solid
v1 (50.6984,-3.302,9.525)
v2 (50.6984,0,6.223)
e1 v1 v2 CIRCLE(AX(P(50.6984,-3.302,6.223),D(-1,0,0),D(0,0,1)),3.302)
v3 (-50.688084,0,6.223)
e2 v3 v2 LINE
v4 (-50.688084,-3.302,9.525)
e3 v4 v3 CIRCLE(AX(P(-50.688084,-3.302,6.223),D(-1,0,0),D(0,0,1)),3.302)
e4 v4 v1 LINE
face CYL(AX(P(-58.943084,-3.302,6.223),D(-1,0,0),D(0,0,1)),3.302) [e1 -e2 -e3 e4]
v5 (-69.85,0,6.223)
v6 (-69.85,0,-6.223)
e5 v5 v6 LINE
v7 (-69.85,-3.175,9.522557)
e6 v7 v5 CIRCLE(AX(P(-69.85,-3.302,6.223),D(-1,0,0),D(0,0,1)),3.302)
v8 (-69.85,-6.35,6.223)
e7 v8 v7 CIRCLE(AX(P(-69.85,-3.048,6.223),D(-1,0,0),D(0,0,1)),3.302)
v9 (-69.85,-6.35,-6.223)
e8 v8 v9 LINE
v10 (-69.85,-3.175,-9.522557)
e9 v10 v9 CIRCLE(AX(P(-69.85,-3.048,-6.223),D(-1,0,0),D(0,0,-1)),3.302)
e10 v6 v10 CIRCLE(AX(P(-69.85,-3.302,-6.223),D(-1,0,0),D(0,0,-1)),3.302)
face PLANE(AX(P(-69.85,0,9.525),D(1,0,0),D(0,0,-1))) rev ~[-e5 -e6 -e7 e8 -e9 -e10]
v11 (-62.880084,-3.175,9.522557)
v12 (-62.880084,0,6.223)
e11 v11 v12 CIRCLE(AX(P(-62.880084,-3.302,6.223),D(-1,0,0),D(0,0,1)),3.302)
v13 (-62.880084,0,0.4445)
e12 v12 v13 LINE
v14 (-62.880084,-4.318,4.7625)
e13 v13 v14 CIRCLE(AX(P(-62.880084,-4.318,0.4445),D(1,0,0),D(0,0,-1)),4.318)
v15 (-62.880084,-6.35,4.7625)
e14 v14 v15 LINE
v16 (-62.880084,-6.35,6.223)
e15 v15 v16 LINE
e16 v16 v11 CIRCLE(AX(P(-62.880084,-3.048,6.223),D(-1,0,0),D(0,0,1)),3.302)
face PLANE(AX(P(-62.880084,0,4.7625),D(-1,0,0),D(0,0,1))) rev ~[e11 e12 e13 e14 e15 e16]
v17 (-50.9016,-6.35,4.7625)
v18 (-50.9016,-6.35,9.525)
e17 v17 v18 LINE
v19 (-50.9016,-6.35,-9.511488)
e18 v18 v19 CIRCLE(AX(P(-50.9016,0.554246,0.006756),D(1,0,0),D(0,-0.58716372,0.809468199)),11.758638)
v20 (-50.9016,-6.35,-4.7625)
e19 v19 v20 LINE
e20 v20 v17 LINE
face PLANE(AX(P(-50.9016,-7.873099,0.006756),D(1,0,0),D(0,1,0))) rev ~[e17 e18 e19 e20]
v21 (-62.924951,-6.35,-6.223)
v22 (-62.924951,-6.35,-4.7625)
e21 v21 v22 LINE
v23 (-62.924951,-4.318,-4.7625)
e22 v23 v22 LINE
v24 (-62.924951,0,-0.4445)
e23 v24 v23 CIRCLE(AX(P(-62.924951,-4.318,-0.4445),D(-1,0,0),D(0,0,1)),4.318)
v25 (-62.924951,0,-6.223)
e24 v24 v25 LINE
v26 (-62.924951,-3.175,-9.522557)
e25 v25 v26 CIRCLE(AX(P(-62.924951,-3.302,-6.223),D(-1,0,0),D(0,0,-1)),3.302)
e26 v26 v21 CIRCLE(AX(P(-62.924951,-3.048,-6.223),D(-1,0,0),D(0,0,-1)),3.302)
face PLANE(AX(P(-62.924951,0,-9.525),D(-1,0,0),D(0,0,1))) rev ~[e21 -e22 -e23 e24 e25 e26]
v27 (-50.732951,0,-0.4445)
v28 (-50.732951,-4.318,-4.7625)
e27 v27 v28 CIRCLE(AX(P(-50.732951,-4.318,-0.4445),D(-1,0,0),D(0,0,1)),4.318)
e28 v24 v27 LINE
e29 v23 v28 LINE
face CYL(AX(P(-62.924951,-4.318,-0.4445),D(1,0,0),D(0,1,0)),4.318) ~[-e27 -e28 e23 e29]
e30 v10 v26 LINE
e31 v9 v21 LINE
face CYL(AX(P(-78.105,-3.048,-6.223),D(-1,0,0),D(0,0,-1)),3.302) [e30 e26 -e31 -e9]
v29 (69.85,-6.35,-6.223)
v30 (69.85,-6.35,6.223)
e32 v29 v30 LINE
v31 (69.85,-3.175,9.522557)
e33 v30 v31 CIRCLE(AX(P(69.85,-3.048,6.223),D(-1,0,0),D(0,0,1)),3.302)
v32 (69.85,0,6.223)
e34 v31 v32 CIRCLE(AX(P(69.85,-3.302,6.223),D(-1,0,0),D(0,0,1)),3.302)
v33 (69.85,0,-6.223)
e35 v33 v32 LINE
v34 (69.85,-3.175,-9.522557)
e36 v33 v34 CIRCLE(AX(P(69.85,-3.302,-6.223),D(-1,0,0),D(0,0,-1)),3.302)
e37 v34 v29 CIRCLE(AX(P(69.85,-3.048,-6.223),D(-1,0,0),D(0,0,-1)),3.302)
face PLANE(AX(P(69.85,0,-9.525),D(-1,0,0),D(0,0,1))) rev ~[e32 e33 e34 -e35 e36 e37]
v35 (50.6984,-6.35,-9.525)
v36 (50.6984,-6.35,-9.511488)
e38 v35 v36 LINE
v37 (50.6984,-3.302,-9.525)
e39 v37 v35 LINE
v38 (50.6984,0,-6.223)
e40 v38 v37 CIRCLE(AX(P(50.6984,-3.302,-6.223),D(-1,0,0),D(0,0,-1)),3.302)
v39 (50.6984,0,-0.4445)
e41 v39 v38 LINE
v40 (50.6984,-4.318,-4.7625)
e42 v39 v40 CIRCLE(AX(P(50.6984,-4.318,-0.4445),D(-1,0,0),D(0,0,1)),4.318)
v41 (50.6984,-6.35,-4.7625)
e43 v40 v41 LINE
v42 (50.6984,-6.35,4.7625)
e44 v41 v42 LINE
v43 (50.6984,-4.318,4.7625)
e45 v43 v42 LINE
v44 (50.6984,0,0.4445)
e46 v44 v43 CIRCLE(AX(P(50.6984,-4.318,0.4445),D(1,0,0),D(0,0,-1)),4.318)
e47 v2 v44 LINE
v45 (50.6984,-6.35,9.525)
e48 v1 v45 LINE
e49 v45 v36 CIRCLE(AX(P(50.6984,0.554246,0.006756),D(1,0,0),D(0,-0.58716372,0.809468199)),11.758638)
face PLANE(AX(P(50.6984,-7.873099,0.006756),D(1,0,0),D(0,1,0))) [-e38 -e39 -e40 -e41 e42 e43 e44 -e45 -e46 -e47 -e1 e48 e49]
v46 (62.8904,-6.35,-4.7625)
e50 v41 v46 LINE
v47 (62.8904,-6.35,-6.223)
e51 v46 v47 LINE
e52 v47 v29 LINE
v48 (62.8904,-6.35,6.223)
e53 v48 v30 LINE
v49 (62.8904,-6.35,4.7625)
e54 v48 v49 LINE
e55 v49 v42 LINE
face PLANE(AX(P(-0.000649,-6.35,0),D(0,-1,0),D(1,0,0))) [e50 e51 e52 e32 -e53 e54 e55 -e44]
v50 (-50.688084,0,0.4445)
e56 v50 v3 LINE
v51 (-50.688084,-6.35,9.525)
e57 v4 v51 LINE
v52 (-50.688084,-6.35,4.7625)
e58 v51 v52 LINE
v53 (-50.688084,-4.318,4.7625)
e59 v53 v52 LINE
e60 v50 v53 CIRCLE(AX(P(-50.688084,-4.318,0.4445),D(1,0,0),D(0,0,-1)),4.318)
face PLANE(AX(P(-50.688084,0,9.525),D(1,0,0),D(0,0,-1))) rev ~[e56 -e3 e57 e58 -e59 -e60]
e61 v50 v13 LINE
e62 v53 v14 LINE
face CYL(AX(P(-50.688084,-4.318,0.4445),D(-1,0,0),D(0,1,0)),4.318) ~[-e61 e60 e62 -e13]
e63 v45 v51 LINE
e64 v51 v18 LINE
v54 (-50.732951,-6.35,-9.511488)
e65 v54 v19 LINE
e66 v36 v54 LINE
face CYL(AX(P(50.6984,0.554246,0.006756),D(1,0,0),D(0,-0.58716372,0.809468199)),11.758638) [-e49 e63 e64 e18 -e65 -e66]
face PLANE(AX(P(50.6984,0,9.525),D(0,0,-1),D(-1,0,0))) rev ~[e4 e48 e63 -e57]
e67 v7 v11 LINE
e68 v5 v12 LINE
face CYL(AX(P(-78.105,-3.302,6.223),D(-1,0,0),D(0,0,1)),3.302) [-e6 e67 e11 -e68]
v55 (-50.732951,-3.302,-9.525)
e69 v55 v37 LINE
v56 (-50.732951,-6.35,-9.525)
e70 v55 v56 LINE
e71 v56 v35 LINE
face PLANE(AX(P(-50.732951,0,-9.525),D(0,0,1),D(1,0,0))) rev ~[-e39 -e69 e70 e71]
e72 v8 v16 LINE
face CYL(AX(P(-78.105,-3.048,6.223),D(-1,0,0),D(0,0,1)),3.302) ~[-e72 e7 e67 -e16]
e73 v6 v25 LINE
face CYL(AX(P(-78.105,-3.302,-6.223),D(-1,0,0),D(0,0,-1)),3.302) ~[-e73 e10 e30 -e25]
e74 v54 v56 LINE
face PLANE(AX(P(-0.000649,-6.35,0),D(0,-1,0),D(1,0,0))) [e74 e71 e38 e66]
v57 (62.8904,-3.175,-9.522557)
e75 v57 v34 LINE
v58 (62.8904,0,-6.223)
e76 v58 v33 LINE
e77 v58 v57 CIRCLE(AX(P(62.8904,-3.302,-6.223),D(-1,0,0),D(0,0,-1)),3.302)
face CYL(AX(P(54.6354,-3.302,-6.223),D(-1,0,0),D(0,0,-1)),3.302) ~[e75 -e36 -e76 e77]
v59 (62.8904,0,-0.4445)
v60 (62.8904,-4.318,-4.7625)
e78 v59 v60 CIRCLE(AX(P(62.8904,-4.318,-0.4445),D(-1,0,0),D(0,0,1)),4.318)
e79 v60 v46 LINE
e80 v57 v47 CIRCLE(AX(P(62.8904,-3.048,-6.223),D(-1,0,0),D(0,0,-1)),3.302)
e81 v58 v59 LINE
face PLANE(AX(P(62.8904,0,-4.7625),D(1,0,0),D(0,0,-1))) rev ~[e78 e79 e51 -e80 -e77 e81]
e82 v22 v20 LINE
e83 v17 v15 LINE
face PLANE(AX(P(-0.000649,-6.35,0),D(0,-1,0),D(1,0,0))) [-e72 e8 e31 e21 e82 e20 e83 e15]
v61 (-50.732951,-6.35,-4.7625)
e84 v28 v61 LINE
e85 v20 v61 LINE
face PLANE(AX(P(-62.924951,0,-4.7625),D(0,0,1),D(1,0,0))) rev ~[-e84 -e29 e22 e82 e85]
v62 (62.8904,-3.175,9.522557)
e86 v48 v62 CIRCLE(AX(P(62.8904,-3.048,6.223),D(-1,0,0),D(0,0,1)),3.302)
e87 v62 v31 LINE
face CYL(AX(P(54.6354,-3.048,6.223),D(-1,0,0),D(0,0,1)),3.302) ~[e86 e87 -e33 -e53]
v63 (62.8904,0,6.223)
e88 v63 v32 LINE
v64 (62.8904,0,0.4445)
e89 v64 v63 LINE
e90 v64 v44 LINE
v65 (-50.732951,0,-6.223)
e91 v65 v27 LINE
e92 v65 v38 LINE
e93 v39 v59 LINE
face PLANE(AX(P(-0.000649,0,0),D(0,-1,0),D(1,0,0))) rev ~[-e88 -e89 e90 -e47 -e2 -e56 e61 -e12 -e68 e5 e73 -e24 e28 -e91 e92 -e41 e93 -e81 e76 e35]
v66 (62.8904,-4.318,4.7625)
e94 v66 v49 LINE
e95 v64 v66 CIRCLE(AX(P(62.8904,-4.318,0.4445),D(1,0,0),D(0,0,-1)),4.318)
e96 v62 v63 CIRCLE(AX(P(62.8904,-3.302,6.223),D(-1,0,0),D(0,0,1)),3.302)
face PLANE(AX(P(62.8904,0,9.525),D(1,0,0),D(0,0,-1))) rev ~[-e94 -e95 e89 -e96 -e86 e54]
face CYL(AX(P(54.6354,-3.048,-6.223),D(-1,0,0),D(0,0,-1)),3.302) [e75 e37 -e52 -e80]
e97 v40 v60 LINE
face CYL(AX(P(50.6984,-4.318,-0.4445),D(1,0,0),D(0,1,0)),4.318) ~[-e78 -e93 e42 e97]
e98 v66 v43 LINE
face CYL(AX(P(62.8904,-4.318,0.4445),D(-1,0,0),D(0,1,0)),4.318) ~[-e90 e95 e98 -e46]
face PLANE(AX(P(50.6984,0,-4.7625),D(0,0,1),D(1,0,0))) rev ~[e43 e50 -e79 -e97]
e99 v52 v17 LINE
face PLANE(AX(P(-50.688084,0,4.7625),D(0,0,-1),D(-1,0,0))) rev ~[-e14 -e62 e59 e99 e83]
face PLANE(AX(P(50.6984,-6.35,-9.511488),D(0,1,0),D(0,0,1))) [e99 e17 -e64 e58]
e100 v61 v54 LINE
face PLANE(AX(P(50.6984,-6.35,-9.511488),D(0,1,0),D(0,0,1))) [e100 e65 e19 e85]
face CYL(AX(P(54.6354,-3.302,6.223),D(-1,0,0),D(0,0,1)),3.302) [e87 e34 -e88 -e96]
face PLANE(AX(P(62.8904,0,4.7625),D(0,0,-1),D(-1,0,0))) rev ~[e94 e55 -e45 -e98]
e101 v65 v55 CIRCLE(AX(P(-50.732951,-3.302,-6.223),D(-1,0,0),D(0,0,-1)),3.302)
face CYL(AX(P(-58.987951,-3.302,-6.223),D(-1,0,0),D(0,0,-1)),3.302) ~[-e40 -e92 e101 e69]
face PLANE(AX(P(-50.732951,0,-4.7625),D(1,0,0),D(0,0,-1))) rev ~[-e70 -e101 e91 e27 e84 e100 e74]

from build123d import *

# Parameters (mm, degrees)
F1_DEPTH    = 6.35
F2_T1_DEPTH = 23.4696
F2_T3_DEPTH = 117.8964839186
F2_T5_DEPTH = 23.4799160814
F2_T7_DEPTH = 117.9413513149
F2_T9_DEPTH = 23.4350486851
F3_R        = 4.318
F5_DEPTH    = 101.6


# Not quite as in the source:
# - a fillet or chamfer that OpenCascade refuses, or shapes differently, is made with other operations: its cross-section is extruded or revolved along the edge and cut away or added


with BuildPart() as f1:
    # F0 (on Front) → F1 (new body)
    with BuildSketch(Plane.XZ):
        Polygon((69.85, -9.525), (69.85, 9.525), (62.8904, 9.525), (62.8904, 4.7625), (50.6984, 4.7625), (50.6984, 9.525), (-50.6880839186, 9.525), (-50.6880839186, 4.7625), (-62.8800839186, 4.7625), (-62.8800839186, 9.525), (-69.85, 9.525), (-69.85, -9.525), (-62.9249513149, -9.525), (-62.9249513149, -4.7625), (-50.7329513149, -4.7625), (-50.7329513149, -9.525), (50.6984, -9.525), (50.6984, -4.7625), (62.8904, -4.7625), (62.8904, -9.525), align=None)
    extrude(amount=F1_DEPTH)

    # F2: fillet of radius 3.302 on 10 edges, made by hand

    # F2_s2 → F2_t1 (cut)
    with BuildSketch(Plane.YZ.offset(54.6354)):
        with BuildLine():
            ThreePointArc((-3.302, 9.525), (-0.9671334085, 8.5578665915), (0, 6.223))
            Line((0, 6.223), (0, 9.525))
            Line((0, 9.525), (-3.302, 9.525))
        make_face()
        with BuildLine():
            ThreePointArc((-3.048, 9.525), (-5.3828665915, 8.5578665915), (-6.35, 6.223))
            Line((-6.35, 6.223), (-6.35, 9.525))
            Line((-6.35, 9.525), (-3.048, 9.525))
        make_face()
        with BuildLine():
            ThreePointArc((-3.302, -9.525), (-0.9671334085, -8.5578665915), (0, -6.223))
            Line((0, -6.223), (0, -9.525))
            Line((0, -9.525), (-3.302, -9.525))
        make_face()
        with BuildLine():
            ThreePointArc((-3.048, -9.525), (-5.3828665915, -8.5578665915), (-6.35, -6.223))
            Line((-6.35, -6.223), (-6.35, -9.525))
            Line((-6.35, -9.525), (-3.048, -9.525))
        make_face()
    extrude(amount=F2_T1_DEPTH, mode=Mode.SUBTRACT)

    # F2_s4 → F2_t3 (cut)
    with BuildSketch(Plane.YZ.offset(-58.9430839186)):
        with BuildLine():
            ThreePointArc((-3.302, 9.525), (-0.9671334085, 8.5578665915), (0, 6.223))
            Line((0, 6.223), (0, 9.525))
            Line((0, 9.525), (-3.302, 9.525))
        make_face()
    extrude(amount=F2_T3_DEPTH, mode=Mode.SUBTRACT)

    # F2_s6 → F2_t5 (cut)
    with BuildSketch(Plane.YZ.offset(-78.105)):
        with BuildLine():
            ThreePointArc((-3.302, 9.525), (-0.9671334085, 8.5578665915), (0, 6.223))
            Line((0, 6.223), (0, 9.525))
            Line((0, 9.525), (-3.302, 9.525))
        make_face()
        with BuildLine():
            ThreePointArc((-3.048, 9.525), (-5.3828665915, 8.5578665915), (-6.35, 6.223))
            Line((-6.35, 6.223), (-6.35, 9.525))
            Line((-6.35, 9.525), (-3.048, 9.525))
        make_face()
    extrude(amount=F2_T5_DEPTH, mode=Mode.SUBTRACT)

    # F2_s8 → F2_t7 (cut)
    with BuildSketch(Plane.YZ.offset(-58.9879513149)):
        with BuildLine():
            ThreePointArc((-3.302, -9.525), (-0.9671334085, -8.5578665915), (0, -6.223))
            Line((0, -6.223), (0, -9.525))
            Line((0, -9.525), (-3.302, -9.525))
        make_face()
    extrude(amount=F2_T7_DEPTH, mode=Mode.SUBTRACT)

    # F2_s10 → F2_t9 (cut)
    with BuildSketch(Plane.YZ.offset(-78.105)):
        with BuildLine():
            ThreePointArc((-3.302, -9.525), (-0.9671334085, -8.5578665915), (0, -6.223))
            Line((0, -6.223), (0, -9.525))
            Line((0, -9.525), (-3.302, -9.525))
        make_face()
        with BuildLine():
            ThreePointArc((-3.048, -9.525), (-5.3828665915, -8.5578665915), (-6.35, -6.223))
            Line((-6.35, -6.223), (-6.35, -9.525))
            Line((-6.35, -9.525), (-3.048, -9.525))
        make_face()
    extrude(amount=F2_T9_DEPTH, mode=Mode.SUBTRACT)

    # F3
    f3_edges = [f1.edges().sort_by_distance(p)[0] for p in [
        (-56.784084, 0, 4.7625),
        (-56.828951, 0, -4.7625),
        (56.7944, 0, -4.7625),
        (56.7944, 0, 4.7625),
    ]]
    fillet(f3_edges, radius=F3_R)

    # F4 (on face) → F5 (join)
    with BuildSketch(Plane.YZ.offset(50.6984)):
        with BuildLine():
            Line((-6.35, 4.7625), (-6.35, 9.525))
            ThreePointArc((-6.35, 9.525), (-11.2043924939, 0.0067562208), (-6.35, -9.5114875585))
            Line((-6.35, -9.5114875585), (-6.35, -4.8156534322))
            Line((-6.35, -4.8156534322), (-6.35, 4.7625))
        make_face()
    extrude(amount=-F5_DEPTH)


solid = f1.part
